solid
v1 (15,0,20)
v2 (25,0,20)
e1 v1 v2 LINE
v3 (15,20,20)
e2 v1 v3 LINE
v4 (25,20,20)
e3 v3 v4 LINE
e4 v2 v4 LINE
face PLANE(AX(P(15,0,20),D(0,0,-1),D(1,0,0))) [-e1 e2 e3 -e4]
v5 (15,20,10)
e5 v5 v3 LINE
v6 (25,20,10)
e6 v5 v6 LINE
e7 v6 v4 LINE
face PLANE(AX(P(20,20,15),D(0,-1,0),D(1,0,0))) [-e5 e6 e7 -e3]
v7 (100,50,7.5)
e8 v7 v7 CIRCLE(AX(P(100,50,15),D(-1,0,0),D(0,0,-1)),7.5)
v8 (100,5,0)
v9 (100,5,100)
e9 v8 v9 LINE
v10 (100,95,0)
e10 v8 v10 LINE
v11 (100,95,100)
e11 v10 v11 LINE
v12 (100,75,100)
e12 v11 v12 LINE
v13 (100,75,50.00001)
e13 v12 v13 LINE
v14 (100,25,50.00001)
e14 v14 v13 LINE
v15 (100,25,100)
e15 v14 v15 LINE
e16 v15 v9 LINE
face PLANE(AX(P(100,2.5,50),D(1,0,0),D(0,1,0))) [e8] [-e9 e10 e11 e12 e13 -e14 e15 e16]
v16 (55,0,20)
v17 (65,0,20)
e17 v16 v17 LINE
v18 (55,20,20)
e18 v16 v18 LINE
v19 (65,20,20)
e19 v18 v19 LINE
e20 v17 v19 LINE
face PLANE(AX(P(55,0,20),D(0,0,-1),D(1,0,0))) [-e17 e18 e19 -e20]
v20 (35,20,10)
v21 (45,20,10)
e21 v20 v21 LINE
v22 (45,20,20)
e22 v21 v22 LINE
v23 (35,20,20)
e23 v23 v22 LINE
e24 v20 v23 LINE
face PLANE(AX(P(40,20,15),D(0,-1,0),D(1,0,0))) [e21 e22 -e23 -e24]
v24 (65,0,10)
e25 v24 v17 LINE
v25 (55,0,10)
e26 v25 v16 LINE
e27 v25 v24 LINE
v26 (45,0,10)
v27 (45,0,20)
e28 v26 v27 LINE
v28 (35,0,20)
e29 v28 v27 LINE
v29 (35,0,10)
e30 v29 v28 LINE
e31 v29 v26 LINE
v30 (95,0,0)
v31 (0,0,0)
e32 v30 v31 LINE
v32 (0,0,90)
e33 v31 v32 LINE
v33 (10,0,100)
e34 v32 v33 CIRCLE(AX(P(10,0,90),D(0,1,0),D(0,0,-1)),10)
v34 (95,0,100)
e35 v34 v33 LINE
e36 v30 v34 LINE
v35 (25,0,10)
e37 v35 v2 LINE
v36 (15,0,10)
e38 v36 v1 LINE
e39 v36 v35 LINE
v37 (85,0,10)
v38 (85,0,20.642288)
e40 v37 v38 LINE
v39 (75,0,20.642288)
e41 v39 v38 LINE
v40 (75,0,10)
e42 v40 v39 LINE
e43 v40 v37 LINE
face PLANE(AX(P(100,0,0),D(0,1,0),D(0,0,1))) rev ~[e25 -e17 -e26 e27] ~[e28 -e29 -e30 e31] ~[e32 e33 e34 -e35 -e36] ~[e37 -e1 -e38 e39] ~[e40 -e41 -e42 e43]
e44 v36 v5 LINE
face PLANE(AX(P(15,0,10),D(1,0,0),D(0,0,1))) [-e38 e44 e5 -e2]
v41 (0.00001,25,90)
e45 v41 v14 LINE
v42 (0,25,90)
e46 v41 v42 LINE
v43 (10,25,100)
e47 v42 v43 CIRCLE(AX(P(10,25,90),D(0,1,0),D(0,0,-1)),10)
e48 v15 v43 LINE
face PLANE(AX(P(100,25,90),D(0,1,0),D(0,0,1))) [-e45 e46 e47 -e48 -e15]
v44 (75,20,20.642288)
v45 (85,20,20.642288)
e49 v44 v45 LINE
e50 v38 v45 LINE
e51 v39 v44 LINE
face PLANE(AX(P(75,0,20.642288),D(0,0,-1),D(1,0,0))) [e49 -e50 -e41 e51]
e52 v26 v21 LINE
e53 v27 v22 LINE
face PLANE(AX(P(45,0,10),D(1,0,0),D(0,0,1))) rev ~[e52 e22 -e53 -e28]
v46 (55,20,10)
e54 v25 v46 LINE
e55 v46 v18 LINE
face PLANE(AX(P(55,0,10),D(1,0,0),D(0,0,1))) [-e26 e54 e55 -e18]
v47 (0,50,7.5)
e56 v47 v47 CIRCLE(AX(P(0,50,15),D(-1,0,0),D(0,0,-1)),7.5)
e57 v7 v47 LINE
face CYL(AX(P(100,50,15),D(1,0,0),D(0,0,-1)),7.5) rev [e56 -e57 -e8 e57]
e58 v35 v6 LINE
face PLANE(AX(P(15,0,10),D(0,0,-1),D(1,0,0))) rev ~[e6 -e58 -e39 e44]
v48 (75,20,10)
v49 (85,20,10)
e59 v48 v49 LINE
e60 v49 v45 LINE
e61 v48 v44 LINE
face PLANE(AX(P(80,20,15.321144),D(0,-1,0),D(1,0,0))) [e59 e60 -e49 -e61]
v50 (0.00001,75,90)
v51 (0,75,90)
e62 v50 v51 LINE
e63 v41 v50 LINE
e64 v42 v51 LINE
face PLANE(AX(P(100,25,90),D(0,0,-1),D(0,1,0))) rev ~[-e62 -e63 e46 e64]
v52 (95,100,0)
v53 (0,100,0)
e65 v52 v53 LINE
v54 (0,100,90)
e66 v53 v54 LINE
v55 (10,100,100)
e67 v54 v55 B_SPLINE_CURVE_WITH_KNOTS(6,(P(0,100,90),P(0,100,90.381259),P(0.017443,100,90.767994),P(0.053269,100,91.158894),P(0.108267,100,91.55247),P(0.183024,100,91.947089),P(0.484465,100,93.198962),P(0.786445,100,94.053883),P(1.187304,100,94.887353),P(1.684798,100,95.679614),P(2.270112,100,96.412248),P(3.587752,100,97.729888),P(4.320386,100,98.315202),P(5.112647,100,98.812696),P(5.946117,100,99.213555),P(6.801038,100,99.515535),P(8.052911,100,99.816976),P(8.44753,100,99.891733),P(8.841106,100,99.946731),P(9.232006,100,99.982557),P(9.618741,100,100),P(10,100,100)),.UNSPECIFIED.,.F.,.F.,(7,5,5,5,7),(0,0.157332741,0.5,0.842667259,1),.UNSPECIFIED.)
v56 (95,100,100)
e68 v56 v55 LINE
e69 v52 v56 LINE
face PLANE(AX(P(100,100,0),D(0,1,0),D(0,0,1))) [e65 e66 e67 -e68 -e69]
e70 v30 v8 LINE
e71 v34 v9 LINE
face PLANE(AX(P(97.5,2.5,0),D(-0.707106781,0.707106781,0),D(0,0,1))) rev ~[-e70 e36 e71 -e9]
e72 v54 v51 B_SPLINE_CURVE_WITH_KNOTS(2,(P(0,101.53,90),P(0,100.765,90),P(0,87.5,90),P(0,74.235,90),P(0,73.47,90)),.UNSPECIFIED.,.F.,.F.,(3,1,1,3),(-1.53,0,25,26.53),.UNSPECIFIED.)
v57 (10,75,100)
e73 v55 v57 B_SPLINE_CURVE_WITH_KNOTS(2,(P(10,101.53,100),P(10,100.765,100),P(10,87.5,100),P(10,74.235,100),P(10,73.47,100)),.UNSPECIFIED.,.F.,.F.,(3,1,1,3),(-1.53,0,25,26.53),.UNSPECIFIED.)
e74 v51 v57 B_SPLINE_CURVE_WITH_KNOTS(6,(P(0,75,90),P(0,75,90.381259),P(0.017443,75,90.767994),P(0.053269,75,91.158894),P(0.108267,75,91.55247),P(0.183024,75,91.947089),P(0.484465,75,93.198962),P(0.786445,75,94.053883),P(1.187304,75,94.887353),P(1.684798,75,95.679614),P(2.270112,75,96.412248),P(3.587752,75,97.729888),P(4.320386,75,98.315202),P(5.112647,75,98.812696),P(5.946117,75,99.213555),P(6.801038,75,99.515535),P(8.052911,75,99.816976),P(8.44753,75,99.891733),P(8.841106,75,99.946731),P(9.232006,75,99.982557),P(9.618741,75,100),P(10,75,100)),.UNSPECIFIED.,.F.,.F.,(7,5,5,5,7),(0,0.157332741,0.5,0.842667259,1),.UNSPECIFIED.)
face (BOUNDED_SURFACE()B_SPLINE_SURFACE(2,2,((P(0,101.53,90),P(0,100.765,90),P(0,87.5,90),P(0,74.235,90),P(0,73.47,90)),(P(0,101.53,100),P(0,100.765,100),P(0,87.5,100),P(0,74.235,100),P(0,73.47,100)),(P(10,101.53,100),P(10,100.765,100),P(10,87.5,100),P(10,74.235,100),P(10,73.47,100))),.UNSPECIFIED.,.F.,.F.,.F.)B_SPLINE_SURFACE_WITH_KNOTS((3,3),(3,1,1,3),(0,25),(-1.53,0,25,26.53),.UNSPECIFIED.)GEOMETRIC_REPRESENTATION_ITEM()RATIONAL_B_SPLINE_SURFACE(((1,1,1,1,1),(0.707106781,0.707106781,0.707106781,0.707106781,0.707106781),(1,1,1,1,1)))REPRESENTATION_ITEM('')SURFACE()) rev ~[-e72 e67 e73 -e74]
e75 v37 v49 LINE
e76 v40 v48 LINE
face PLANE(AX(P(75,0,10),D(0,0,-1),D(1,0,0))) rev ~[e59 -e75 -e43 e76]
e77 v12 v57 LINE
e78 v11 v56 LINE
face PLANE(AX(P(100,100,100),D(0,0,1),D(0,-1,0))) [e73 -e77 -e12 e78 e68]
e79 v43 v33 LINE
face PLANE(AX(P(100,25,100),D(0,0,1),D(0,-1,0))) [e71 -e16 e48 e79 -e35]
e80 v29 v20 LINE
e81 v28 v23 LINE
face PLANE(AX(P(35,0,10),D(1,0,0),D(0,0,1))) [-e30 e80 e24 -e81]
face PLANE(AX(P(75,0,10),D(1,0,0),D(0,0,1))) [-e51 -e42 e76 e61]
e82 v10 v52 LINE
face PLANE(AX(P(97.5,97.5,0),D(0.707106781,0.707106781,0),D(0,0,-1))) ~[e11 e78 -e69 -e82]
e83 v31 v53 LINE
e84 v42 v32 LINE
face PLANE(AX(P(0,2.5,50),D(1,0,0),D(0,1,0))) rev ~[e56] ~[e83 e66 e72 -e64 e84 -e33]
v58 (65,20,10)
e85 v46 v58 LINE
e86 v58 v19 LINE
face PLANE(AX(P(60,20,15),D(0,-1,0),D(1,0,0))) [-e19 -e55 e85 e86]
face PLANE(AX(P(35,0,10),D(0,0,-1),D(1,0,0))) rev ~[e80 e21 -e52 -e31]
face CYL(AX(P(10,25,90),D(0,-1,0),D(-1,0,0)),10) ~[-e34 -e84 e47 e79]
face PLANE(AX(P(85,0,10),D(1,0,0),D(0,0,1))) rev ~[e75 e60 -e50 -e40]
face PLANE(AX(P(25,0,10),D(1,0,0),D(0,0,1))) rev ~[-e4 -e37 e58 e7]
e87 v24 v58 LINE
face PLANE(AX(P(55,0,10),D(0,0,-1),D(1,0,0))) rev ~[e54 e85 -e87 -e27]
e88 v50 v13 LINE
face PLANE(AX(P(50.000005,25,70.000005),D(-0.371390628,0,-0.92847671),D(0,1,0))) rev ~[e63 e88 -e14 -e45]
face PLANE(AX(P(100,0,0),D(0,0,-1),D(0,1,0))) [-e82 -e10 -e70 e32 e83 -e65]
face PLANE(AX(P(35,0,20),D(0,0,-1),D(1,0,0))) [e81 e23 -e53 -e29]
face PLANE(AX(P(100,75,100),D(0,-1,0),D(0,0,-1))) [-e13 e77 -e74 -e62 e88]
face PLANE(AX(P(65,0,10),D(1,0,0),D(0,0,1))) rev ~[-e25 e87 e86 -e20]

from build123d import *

# Parameters (mm, degrees)
F0_W     = 5
F0_H     = 100
F0_W_2   = 50
F0_H_2   = 40
F1_DEPTH = 100
F2_W     = 10
F2_H     = 10
F2_H_2   = 10.6422880292
F3_DEPTH = 20
F4_R     = 10
F5_R     = 10
F6_SIZE  = 5
F7_SIZE  = 5
F8_SIZE2 = 39.99999
F8_SIZE  = 99.99999


# Not quite as in the source:
# - a fillet or chamfer is up to 0.001 mm smaller than in the source, because OpenCascade refuses the exact size


with BuildPart() as f1:
    # F0 (on Right) → F1 (new body)
    with BuildSketch(Plane.YZ):
        with Locations((2.5, 50)):
            Rectangle(F0_W, F0_H)
        Polygon((5, 100), (5, 0), (50, 0), (95, 0), (95, 100), (75, 100), (75, 90), (75, 50), (25, 50), (25, 90), (25, 100), align=None)
        with BuildLine():
            ThreePointArc((57.5, 15), (55.3033008589, 9.6966991411), (50, 7.5))
            ThreePointArc((50, 7.5), (44.6966991411, 20.3033008589), (57.5, 15))
        make_face(mode=Mode.SUBTRACT)
        with Locations((97.5, 50)):
            Rectangle(F0_W, F0_H)
        with Locations((50, 70)):
            Rectangle(F0_W_2, F0_H_2)
    extrude(amount=-F1_DEPTH)

    # F2 (on Front) → F3 (cut)
    with BuildSketch(Plane.XZ):
        with Locations((-80, 15)):
            Rectangle(F2_W, F2_H)
        with Locations((-60, 15)):
            Rectangle(F2_W, F2_H)
        with Locations((-40, 15)):
            Rectangle(F2_W, F2_H)
        with Locations((-20, 15.3211440146)):
            Rectangle(F2_W, F2_H_2)
    extrude(amount=-F3_DEPTH, mode=Mode.SUBTRACT)

    # F4
    f4_edges = [f1.edges().sort_by_distance(p)[0] for p in [
        (-100, 12.5, 100),
    ]]
    fillet(f4_edges, radius=F4_R)

    # F5
    f5_edges = [f1.edges().sort_by_distance(p)[0] for p in [
        (-100, 87.5, 100),
    ]]
    fillet(f5_edges, radius=F5_R)

    # F6
    f6_edges = [f1.edges().sort_by_distance(p)[0] for p in [
        (0, 0, 50),
    ]]
    chamfer(f6_edges, length=F6_SIZE)

    # F7
    f7_edges = [f1.edges().sort_by_distance(p)[0] for p in [
        (0, 100, 50),
    ]]
    chamfer(f7_edges, length=F7_SIZE)

    # F8 (size 100 and 40 in the source; OpenCascade refuses exactly that, so slightly less here)
    f8_edges = [f1.edges().sort_by_distance(p)[0] for p in [
        (0, 50, 90),
    ]]
    f8_side = f1.faces().sort_by_distance((-50, 50, 90))[0]
    chamfer(f8_edges, length=F8_SIZE, length2=F8_SIZE2, reference=f8_side)


with BuildPart() as f1_1:
    # F9: moved
    add(f1.part.moved(Location((100, 0, 0))))


solid = f1_1.part
